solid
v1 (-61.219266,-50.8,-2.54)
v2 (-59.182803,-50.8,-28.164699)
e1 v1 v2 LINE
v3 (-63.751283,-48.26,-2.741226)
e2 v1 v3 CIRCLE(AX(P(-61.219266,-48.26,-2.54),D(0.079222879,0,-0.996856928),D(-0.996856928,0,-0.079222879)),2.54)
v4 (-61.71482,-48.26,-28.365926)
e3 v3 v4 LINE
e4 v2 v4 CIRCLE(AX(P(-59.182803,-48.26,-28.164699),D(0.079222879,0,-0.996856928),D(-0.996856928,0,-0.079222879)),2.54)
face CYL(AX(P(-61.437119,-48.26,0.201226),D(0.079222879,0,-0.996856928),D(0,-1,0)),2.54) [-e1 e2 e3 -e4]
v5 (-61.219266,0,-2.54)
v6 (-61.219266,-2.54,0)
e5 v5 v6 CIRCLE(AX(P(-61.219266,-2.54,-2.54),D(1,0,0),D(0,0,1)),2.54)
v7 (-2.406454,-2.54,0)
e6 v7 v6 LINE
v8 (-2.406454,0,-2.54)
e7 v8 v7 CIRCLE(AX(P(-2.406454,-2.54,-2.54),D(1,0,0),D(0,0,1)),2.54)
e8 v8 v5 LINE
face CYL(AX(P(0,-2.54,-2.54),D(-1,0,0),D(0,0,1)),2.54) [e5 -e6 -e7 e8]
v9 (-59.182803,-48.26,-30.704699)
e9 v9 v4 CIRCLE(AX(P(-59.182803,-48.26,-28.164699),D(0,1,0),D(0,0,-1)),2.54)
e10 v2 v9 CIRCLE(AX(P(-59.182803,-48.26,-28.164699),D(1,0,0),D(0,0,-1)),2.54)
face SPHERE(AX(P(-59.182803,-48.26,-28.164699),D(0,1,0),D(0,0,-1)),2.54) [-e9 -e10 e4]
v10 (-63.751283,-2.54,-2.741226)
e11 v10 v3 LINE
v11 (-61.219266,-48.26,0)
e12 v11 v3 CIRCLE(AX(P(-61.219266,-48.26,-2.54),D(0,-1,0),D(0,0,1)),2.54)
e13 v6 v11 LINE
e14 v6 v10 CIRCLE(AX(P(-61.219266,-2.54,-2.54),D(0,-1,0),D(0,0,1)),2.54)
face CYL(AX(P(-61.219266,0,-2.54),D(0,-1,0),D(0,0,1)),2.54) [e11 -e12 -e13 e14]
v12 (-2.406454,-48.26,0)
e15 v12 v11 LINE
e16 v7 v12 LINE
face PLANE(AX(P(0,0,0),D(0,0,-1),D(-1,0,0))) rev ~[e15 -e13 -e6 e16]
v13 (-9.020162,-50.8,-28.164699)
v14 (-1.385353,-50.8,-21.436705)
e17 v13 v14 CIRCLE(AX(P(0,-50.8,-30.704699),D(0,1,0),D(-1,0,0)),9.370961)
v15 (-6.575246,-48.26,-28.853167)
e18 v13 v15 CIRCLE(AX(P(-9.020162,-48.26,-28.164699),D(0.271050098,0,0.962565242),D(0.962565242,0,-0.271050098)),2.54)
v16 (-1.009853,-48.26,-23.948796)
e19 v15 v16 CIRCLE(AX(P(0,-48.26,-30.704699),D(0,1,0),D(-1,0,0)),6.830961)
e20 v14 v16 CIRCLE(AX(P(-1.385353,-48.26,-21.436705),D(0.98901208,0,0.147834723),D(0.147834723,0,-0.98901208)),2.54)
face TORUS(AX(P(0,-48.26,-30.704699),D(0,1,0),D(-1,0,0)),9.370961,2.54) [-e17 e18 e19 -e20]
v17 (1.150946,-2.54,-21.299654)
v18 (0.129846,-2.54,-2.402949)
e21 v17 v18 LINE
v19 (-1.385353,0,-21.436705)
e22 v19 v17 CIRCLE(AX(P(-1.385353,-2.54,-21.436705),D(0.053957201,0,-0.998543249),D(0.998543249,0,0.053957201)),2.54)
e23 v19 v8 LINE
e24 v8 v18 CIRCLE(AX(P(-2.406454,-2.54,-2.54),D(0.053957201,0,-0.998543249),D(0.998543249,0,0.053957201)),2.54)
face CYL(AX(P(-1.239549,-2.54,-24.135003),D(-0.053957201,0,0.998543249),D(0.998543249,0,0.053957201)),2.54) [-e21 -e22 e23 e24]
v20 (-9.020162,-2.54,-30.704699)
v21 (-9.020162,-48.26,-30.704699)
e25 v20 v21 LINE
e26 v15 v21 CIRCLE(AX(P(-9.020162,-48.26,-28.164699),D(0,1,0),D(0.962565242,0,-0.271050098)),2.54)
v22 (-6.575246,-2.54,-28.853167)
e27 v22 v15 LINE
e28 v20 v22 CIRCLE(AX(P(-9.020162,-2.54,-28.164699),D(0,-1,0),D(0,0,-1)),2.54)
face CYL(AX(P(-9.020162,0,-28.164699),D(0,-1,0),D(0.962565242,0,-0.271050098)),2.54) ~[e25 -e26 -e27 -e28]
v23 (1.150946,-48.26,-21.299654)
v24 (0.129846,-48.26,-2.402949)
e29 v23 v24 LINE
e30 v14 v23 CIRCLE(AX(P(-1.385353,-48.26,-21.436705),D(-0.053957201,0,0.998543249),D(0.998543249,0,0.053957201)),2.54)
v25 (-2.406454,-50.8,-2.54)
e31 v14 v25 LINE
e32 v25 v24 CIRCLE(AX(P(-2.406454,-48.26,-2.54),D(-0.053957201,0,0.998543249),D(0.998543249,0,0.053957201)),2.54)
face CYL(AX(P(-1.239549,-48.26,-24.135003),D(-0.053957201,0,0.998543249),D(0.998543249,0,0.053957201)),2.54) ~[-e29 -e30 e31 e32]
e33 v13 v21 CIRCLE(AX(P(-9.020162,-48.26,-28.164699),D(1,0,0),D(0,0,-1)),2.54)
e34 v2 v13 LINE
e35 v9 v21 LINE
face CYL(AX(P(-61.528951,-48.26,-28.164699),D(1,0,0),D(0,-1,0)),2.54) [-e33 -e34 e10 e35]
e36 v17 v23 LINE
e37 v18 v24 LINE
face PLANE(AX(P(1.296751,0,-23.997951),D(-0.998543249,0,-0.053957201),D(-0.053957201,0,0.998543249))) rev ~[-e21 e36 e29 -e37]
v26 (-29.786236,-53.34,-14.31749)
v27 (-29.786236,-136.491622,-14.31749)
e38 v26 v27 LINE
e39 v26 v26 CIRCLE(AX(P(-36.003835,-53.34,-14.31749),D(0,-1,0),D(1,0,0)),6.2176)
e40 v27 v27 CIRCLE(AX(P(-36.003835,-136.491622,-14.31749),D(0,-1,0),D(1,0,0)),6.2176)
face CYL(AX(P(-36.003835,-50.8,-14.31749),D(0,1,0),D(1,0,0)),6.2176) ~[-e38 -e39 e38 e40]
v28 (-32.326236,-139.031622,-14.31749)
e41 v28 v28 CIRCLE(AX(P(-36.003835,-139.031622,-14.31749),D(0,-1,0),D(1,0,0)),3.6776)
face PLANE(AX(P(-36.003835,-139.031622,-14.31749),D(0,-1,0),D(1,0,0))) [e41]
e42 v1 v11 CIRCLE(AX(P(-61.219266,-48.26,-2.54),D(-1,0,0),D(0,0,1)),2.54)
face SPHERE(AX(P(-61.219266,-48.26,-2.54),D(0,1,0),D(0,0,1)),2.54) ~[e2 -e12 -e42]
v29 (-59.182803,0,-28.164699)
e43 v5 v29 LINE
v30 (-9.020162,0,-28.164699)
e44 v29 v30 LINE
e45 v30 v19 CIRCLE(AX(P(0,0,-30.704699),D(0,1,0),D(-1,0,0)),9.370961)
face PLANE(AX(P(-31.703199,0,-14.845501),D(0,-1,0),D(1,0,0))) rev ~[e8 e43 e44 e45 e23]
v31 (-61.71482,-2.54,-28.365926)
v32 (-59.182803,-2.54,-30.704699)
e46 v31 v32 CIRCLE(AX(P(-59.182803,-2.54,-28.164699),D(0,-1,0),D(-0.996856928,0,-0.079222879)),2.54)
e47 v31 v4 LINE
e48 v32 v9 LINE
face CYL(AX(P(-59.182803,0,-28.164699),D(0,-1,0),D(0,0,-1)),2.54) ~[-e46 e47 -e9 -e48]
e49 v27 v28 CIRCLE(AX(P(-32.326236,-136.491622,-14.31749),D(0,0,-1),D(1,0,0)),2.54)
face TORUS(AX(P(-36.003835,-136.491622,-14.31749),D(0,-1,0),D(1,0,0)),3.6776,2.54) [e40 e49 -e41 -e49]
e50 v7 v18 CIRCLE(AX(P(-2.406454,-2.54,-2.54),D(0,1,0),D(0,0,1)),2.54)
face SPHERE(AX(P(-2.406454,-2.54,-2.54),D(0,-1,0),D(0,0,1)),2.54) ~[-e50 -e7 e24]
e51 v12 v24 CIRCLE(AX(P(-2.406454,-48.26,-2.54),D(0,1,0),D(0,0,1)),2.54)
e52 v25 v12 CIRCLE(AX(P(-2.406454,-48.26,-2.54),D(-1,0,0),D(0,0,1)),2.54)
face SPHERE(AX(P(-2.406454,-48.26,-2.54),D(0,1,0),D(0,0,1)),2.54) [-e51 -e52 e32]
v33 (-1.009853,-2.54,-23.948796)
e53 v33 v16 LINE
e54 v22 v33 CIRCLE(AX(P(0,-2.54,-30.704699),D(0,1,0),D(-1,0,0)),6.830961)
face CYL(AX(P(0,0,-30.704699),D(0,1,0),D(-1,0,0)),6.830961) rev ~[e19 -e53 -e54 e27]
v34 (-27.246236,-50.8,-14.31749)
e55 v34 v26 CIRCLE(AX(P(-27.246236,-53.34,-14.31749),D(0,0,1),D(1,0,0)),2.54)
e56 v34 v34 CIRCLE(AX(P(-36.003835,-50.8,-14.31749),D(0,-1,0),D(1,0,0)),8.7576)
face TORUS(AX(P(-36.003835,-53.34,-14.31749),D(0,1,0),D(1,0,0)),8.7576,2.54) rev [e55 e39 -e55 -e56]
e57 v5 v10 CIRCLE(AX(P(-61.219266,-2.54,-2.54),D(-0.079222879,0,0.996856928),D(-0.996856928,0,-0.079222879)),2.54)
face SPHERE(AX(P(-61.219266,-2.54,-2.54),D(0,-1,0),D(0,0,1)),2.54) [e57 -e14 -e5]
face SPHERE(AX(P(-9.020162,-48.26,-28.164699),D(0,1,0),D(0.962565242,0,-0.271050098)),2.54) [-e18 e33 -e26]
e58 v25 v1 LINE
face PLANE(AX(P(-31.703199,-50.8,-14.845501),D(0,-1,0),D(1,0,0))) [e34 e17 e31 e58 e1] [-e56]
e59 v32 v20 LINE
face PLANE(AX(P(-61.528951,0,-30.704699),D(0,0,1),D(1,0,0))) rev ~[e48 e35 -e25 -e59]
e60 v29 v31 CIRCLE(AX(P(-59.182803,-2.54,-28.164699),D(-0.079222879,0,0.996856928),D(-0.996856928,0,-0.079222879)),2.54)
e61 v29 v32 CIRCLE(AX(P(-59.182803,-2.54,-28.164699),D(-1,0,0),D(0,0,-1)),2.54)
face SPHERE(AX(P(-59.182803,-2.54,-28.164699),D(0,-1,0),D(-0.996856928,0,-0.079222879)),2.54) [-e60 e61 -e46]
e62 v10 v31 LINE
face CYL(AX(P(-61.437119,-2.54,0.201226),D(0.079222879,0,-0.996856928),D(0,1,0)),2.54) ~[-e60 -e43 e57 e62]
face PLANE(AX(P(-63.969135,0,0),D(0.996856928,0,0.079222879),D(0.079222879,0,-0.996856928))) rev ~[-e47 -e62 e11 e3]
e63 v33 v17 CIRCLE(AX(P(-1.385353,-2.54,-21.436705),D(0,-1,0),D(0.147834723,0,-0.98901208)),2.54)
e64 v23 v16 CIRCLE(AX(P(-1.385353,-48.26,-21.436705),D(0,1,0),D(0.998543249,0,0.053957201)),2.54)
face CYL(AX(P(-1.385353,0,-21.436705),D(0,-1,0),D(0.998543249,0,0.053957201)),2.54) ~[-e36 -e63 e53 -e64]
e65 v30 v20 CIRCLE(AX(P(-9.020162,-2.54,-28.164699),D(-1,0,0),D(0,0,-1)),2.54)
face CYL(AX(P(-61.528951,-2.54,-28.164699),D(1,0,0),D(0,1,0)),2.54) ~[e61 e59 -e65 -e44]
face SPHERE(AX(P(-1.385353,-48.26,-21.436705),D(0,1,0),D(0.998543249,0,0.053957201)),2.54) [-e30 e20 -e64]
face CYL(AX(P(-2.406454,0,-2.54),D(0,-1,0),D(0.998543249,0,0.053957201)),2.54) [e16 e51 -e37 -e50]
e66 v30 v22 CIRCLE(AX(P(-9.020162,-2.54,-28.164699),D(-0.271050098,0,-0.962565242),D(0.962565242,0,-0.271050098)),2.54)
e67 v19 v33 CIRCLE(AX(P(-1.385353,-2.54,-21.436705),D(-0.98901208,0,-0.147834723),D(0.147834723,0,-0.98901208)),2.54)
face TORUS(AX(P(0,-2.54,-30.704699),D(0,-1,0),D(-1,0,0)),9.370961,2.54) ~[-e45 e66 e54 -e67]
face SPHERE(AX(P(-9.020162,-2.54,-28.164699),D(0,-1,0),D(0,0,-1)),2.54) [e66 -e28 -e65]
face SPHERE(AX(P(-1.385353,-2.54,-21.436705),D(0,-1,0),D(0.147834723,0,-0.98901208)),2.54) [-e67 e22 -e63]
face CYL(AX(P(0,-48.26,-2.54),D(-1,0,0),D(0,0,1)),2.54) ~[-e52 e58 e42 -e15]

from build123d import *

# Parameters (mm, degrees)
F1_DEPTH = 50.8
F2_R     = 6.217599599
F3_DEPTH = 88.2316216
F4_R     = 2.54


# Not quite as in the source:
# - an extrude ends at something that could not be found from the text; its depth is read off the source's solid


with BuildPart() as f1:
    # F0 (on Front) → F1 (new body)
    with BuildSketch(Plane.XZ):
        with BuildLine():
            Line((1.2967513424, -23.9979514112), (0, 0))
            Line((0, 0), (-63.9691352844, 0))
            Line((-63.9691352844, 0), (-61.5289509296, -30.7046994567))
            Line((-61.5289509296, -30.7046994567), (-6.8309613811, -30.7046994567))
            ThreePointArc((-6.8309613811, -30.7046994567), (-4.3476416049, -25.4359191552), (1.2967513424, -23.9979514112))
        make_face()
    extrude(amount=F1_DEPTH)

    # F2 (on face) → F3 (join, through all)
    with BuildSketch(Plane.XZ.offset(50.8)):
        with Locations((-36.0038354993, -14.3174901605)):
            Circle(F2_R)
    extrude(amount=F3_DEPTH)

    # F4
    f4_edges = [f1.edges().sort_by_distance(p)[0] for p in [
        (-42.221435, -139.031622, -14.31749),
        (-61.528951, -25.4, -30.704699),
        (-63.969135, -25.4, 0),
        (1.296751, -25.4, -23.997951),
        (-6.830961, -25.4, -30.704699),
        (0, -25.4, 0),
        (-31.984568, 0, 0),
        (-62.749043, 0, -15.35235),
        (-34.179956, 0, -30.704699),
        (-4.347642, 0, -25.435919),
        (0.648376, 0, -11.998976),
        (-31.984568, -50.8, 0),
        (0.648376, -50.8, -11.998976),
        (-4.347642, -50.8, -25.435919),
        (-34.179956, -50.8, -30.704699),
        (-62.749043, -50.8, -15.35235),
        (-42.221435, -50.8, -14.31749),
    ]]
    fillet(f4_edges, radius=F4_R)


solid = f1.part
